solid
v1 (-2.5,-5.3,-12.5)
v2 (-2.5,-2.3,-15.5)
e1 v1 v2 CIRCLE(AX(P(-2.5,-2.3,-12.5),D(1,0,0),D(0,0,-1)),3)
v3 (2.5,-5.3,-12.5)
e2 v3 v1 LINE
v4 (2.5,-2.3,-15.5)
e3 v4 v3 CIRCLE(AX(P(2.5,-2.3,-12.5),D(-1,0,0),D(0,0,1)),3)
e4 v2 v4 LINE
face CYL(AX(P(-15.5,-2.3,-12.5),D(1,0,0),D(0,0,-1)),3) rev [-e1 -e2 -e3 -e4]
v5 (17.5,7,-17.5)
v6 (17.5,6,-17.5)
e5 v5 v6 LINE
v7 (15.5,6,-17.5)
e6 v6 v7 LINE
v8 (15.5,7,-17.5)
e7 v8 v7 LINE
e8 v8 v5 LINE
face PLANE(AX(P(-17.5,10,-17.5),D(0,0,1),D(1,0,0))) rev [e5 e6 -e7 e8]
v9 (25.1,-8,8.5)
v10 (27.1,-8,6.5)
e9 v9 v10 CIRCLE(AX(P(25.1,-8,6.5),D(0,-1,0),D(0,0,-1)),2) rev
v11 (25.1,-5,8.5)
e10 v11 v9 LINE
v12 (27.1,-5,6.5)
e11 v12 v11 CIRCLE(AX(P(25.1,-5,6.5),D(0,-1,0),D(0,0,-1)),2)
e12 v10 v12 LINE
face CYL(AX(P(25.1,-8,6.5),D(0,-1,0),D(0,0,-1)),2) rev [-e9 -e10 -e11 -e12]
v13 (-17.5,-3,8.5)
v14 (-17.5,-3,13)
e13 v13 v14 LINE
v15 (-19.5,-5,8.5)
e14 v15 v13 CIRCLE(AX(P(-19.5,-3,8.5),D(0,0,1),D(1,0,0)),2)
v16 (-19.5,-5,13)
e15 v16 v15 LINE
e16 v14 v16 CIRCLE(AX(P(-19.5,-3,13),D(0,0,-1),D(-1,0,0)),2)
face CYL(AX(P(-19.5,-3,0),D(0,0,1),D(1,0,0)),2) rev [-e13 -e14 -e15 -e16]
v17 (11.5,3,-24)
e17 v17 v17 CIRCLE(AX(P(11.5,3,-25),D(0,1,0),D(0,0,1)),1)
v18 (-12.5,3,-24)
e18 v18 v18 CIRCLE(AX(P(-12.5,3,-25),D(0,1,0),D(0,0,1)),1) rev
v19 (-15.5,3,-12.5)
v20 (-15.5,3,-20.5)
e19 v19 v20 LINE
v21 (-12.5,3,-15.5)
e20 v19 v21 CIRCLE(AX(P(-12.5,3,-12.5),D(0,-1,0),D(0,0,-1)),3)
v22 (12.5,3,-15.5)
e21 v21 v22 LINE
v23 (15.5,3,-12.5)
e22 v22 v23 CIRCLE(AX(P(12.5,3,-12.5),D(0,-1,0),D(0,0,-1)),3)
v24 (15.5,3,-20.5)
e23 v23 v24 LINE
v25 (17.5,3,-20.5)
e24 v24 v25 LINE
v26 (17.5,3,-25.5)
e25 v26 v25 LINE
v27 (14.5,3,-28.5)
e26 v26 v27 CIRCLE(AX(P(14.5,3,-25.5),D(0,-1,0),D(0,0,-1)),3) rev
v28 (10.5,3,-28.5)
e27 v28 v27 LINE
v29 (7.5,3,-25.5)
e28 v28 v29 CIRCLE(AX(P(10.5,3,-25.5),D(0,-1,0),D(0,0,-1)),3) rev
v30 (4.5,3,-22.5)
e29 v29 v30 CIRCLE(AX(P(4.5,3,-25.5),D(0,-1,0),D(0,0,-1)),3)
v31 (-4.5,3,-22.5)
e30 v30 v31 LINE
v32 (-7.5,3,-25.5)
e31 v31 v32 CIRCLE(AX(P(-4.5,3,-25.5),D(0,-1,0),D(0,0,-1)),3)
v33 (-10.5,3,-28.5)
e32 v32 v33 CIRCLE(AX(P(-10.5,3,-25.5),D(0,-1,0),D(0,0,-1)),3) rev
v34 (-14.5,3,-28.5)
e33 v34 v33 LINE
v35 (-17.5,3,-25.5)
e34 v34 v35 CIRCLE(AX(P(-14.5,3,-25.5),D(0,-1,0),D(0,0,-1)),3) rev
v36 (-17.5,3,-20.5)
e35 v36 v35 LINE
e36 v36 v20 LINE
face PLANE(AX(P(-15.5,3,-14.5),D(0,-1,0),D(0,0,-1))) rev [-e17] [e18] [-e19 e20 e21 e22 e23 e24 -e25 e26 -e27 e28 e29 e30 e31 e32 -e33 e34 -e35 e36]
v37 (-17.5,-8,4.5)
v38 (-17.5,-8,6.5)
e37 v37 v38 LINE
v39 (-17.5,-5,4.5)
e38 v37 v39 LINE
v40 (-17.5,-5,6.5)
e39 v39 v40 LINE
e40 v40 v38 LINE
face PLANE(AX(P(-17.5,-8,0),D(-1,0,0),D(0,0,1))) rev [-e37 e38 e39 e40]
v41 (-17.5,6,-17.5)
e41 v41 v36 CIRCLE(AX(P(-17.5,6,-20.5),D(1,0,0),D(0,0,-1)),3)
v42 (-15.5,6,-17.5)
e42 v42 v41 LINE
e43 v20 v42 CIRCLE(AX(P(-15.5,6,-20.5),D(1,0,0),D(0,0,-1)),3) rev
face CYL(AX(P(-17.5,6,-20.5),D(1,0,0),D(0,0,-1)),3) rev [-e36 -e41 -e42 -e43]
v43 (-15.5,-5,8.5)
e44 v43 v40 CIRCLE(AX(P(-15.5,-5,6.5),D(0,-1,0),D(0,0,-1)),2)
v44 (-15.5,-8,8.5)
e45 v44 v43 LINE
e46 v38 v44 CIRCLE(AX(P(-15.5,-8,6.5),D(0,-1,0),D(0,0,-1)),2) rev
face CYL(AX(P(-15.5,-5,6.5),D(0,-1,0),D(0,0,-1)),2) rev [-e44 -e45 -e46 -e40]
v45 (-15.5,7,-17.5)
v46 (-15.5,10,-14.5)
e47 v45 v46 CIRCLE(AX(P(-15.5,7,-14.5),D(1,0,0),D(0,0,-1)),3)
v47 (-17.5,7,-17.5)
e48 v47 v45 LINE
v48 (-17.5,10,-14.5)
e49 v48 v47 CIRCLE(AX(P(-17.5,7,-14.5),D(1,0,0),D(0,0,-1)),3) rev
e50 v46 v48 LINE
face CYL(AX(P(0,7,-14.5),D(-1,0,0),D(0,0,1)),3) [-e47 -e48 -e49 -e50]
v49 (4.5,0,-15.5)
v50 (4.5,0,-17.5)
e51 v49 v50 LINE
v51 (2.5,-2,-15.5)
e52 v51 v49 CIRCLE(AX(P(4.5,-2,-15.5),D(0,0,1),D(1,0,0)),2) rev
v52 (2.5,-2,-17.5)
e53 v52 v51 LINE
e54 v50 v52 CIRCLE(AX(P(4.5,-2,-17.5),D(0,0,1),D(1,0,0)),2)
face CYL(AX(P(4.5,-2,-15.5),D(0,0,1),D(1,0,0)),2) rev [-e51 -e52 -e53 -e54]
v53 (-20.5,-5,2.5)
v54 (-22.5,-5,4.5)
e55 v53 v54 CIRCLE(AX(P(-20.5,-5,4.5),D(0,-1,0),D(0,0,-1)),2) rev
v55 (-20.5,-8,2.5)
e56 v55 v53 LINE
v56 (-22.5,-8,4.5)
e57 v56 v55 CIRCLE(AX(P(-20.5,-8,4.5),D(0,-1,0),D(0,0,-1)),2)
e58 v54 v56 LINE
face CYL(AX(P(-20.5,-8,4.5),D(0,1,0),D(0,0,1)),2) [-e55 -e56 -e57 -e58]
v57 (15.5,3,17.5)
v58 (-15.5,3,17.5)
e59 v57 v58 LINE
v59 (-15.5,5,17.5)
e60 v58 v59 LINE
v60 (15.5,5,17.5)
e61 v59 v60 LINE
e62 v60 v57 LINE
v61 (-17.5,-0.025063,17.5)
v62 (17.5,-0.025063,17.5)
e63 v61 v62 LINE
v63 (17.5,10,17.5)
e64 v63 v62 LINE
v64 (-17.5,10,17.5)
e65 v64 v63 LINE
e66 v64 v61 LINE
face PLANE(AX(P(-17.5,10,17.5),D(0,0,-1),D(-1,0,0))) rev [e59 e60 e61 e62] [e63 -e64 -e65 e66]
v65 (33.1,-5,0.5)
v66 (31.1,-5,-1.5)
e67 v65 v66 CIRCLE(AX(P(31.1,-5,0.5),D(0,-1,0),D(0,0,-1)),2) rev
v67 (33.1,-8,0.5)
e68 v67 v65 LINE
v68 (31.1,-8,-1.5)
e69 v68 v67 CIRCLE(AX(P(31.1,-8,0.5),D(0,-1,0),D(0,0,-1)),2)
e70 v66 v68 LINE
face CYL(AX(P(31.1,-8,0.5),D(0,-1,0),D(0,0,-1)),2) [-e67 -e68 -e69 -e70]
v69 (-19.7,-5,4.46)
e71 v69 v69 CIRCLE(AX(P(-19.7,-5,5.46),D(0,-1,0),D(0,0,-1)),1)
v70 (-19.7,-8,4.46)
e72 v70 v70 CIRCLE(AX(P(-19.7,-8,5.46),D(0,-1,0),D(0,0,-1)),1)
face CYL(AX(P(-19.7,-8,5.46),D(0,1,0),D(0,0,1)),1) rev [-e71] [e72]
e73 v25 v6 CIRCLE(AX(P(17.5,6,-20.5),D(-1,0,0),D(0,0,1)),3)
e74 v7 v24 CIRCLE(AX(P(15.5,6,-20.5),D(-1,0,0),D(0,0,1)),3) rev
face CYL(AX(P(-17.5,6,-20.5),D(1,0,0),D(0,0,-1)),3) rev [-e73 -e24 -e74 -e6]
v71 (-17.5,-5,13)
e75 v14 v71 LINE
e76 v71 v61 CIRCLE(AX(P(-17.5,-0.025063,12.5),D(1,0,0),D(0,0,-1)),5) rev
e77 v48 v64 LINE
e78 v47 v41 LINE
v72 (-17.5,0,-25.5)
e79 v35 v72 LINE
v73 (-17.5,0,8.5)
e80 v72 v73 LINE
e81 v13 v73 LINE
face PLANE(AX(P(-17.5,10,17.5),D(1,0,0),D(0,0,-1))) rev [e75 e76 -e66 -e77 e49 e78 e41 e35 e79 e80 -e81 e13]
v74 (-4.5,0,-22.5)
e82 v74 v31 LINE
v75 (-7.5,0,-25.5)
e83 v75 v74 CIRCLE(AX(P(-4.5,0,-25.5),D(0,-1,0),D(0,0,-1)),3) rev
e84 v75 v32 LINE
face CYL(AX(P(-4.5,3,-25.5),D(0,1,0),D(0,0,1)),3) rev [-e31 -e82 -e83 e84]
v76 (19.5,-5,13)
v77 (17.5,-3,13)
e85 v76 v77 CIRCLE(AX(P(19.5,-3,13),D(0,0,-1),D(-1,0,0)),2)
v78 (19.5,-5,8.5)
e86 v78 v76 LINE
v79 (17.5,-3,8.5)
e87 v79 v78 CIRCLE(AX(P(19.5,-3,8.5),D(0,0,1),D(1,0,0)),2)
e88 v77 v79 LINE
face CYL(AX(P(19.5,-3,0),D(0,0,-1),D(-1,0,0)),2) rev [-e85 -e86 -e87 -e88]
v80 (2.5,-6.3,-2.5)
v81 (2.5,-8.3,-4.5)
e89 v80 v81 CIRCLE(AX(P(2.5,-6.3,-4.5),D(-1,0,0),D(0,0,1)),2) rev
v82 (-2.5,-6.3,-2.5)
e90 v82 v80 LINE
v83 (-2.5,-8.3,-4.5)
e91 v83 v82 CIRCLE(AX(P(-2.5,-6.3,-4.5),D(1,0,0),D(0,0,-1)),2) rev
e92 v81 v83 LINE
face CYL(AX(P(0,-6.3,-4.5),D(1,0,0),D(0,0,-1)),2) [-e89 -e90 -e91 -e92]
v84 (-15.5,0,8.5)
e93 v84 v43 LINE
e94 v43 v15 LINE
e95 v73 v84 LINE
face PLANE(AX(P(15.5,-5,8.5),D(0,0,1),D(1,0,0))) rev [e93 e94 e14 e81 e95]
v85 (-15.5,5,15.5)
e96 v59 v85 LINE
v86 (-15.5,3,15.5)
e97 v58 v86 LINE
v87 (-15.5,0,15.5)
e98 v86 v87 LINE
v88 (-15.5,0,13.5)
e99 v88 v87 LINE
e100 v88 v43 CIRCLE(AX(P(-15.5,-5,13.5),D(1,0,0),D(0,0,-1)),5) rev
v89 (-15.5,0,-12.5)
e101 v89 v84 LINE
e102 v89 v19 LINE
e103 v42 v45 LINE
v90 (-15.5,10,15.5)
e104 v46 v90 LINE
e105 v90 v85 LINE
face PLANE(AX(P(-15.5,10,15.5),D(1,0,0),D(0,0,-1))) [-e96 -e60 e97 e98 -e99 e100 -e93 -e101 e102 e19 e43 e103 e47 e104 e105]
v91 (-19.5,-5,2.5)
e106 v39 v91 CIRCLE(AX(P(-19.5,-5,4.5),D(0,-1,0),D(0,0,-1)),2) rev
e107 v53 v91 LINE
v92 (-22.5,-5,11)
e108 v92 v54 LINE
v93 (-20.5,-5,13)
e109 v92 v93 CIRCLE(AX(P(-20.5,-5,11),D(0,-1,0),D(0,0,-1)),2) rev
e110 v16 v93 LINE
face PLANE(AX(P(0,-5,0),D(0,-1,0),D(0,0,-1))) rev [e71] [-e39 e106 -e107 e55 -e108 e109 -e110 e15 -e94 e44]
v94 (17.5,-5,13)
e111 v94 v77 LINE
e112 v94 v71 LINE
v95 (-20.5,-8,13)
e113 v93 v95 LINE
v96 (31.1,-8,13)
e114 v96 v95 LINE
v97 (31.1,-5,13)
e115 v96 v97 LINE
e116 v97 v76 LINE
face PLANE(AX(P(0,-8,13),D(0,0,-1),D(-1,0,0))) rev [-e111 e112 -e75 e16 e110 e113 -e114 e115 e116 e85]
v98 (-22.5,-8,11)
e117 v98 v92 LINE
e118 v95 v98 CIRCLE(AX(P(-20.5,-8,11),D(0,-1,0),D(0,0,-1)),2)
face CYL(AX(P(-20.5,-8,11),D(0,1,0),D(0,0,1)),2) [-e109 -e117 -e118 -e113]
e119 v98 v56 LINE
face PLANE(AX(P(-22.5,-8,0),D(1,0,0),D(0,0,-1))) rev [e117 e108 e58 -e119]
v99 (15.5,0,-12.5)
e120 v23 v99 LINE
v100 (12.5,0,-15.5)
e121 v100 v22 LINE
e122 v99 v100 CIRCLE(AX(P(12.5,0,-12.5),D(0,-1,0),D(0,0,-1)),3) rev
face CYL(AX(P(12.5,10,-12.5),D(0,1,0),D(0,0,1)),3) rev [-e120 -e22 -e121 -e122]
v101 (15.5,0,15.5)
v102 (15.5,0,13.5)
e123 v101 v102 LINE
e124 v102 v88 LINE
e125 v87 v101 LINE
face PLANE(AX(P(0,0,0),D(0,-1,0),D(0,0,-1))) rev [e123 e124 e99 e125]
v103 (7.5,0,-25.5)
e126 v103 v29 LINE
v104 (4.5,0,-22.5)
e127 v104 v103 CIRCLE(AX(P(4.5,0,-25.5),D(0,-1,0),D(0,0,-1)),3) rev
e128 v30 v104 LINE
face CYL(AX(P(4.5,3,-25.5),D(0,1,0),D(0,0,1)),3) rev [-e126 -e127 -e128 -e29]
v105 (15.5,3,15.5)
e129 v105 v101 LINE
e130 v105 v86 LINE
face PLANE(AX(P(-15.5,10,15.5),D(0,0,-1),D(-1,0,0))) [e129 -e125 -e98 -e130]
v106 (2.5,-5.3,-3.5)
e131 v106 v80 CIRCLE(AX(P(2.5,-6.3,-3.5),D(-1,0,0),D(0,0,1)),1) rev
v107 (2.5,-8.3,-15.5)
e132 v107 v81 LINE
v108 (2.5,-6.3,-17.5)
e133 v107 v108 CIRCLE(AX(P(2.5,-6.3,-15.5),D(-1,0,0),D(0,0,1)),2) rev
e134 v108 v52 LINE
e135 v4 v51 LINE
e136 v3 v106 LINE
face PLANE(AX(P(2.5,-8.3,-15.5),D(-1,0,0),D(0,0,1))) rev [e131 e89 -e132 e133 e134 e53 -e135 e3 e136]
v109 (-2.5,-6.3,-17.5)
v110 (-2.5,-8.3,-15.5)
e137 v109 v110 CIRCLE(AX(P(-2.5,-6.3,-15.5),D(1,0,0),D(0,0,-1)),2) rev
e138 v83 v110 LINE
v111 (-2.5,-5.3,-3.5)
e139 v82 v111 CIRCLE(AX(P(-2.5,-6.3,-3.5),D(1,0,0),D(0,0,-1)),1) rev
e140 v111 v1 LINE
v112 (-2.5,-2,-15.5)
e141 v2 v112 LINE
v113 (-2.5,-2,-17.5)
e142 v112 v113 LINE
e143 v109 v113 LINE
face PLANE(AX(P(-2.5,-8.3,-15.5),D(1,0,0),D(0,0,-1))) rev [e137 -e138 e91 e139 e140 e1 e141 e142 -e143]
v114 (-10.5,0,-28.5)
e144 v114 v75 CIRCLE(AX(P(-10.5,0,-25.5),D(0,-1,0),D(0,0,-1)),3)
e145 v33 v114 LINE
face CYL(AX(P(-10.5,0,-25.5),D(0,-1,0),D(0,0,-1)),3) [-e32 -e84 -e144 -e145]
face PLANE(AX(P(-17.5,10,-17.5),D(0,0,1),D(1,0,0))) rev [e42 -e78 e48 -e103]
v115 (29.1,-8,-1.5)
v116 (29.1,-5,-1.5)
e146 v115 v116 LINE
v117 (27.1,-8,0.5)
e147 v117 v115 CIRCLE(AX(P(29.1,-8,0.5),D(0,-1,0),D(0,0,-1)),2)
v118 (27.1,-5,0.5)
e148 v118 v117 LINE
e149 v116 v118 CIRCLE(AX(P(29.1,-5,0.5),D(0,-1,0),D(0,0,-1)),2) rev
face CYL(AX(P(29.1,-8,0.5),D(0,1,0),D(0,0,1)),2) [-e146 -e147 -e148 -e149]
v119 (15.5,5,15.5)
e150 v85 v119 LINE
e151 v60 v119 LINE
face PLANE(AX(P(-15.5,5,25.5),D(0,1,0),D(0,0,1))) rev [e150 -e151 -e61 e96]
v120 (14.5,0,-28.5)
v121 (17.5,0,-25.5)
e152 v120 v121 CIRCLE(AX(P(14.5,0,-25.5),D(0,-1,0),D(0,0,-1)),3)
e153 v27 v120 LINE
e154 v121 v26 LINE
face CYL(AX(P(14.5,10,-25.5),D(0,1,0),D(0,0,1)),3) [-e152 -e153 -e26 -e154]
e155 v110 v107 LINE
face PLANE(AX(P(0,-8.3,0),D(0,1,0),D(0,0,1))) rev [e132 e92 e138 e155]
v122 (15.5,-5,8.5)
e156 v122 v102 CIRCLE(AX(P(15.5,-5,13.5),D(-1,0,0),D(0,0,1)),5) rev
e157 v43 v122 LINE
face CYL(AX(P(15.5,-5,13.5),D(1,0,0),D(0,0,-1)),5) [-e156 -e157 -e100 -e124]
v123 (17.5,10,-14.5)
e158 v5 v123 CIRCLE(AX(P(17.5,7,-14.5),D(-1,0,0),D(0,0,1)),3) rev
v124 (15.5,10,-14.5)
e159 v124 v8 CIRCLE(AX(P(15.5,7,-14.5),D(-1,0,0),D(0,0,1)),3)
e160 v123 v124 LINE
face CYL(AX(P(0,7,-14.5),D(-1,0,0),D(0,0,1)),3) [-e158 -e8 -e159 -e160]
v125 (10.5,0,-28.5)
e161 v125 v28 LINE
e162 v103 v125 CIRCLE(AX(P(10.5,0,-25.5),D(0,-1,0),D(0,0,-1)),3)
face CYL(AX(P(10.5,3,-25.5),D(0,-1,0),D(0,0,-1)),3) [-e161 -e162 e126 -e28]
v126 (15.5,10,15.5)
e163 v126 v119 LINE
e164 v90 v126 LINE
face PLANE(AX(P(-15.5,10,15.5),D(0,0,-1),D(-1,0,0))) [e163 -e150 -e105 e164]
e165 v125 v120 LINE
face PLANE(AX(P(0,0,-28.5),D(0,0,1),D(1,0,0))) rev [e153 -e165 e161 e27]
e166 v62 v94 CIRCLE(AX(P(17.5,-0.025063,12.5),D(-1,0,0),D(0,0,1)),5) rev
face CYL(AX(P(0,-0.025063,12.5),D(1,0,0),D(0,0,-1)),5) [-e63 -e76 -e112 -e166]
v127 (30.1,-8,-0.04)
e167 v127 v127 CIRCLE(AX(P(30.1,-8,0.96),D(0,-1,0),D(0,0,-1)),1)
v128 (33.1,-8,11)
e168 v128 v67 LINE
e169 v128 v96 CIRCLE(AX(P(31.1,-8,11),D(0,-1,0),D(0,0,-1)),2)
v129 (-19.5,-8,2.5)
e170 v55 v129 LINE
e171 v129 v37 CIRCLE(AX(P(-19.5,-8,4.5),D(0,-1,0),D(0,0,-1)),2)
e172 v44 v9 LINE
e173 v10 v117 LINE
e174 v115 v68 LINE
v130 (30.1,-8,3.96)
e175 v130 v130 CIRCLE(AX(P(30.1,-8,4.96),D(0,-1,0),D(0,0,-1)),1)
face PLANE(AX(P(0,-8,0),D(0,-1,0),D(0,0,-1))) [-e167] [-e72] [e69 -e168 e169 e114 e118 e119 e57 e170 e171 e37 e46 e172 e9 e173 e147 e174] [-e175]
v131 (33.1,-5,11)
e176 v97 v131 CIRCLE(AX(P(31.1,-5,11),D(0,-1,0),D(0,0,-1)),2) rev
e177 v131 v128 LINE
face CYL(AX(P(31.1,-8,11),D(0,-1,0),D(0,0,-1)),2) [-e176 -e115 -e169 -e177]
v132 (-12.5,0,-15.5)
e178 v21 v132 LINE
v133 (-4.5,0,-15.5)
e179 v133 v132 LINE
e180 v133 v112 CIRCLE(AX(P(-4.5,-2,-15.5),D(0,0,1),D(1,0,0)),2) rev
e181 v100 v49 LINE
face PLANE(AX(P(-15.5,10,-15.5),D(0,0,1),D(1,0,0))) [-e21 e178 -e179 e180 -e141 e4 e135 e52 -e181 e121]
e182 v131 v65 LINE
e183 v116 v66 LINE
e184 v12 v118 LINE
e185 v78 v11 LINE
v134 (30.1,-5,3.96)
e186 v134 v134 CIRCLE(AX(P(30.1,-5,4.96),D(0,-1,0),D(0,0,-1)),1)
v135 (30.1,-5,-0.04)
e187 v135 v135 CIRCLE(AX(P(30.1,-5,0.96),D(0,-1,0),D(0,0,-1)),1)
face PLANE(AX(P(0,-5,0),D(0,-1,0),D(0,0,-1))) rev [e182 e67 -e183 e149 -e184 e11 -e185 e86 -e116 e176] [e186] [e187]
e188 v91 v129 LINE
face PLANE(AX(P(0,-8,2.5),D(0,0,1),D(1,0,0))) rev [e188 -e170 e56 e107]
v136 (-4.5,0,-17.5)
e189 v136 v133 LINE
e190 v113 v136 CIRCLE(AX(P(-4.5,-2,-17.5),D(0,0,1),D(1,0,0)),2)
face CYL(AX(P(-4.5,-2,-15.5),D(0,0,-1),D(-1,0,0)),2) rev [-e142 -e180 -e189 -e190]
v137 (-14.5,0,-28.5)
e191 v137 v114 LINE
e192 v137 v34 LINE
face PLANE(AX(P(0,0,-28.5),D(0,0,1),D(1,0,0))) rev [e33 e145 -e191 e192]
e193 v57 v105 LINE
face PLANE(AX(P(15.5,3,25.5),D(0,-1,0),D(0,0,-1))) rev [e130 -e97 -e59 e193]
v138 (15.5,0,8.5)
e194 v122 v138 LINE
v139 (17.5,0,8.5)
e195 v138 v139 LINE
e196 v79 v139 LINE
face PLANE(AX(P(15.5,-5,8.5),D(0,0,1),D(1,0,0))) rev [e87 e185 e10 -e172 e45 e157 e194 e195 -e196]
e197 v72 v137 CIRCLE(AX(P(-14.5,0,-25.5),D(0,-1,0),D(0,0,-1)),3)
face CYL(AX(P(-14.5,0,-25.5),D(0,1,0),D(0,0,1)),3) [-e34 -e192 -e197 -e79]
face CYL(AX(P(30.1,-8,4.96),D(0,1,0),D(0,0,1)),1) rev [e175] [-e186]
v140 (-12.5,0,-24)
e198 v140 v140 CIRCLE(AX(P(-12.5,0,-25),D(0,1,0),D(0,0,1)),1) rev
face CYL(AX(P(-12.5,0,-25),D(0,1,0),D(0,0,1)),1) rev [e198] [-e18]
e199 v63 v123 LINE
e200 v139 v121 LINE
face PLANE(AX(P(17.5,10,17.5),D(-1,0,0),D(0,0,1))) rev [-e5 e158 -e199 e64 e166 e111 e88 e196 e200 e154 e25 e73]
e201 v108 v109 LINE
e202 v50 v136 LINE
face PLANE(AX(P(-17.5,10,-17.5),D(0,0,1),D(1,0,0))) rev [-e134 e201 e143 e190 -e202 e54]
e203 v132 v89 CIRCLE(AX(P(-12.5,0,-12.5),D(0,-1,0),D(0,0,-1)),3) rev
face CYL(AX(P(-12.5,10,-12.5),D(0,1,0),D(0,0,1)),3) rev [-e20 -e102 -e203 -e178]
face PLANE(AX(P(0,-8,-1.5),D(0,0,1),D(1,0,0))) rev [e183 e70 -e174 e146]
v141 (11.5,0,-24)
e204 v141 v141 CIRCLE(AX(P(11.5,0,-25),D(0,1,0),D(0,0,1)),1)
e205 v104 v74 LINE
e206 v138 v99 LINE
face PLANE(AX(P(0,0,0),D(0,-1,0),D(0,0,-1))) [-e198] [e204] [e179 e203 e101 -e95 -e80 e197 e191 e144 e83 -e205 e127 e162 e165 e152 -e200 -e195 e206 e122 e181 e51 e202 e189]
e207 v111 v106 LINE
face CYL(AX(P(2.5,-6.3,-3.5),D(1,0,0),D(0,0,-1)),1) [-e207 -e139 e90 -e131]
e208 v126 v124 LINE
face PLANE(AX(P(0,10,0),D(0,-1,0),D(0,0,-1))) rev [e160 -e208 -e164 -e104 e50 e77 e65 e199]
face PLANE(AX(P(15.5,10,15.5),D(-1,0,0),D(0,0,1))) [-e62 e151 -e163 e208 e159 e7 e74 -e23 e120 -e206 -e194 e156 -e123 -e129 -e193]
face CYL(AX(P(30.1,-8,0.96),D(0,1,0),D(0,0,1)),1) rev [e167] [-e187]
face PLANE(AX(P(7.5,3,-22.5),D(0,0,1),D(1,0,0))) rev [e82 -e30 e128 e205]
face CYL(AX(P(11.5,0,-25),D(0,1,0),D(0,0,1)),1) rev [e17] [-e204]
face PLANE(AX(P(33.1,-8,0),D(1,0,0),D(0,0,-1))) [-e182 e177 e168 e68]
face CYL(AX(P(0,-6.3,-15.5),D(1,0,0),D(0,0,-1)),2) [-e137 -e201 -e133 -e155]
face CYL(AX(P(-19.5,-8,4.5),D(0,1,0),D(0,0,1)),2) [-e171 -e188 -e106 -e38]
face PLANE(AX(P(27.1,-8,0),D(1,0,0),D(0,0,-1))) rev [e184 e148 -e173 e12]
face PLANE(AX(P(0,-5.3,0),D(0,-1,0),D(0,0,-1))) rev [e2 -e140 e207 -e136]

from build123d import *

# Parameters (mm, degrees)
SKETCH_1_W          = 35
SKETCH_1_H          = 35
SKETCH_1_W_2        = 31
SKETCH_1_H_2        = 31
EXTRUDE_1_DEPTH     = 10
EXTRUDE_2_DEPTH     = 5
SKETCH_3_W          = 31
SKETCH_3_H          = 7
CUT_EXTRUDE_1_DEPTH = 3
SKETCH_4_W          = 5
SKETCH_4_H          = 4.5
SKETCH_4_W_2        = 35
SKETCH_4_H_2        = 6
SKETCH_4_R          = 1
SKETCH_4_W_3        = 6
SKETCH_4_H_3        = 10
EXTRUDE_3_DEPTH     = 3
FILLET_2_R          = 2
FILLET_3_R          = 2
SKETCH_5_W          = 5
SKETCH_5_H          = 2
EXTRUDE_4_DEPTH     = 8.3
SKETCH_6_W          = 5
SKETCH_6_H          = 13
EXTRUDE_5_DEPTH     = 3
FILLET_4_R          = 2
FILLET_5_R          = 1
FILLET_6_R          = 2
SKETCH_7_W          = 31
SKETCH_7_H          = 2
CUT_EXTRUDE_2_DEPTH = 10
FILLET_7_R          = 5
SKETCH_8_W          = 35
SKETCH_8_H          = 11
SKETCH_8_R          = 1
EXTRUDE_6_DEPTH     = 3
FILLET_8_R          = 3
FILLET_9_R          = 3
SKETCH_11_W         = 15
SKETCH_11_H         = 6
CUT_EXTRUDE_4_DEPTH = 3
FILLET_START        = -1
FILLET_10_DEPTH     = 4
FILLET_10_2_DEPTH   = 3
FILLET_11_R         = 3


with BuildPart() as part:
    # 草图1 → 凸台-拉伸1 (new body)
    with BuildSketch(Plane(origin=(0, 0, 0), x_dir=(1, 0, 0), z_dir=(0, 1, 0))):
        Rectangle(SKETCH_1_W, SKETCH_1_H)
        Rectangle(SKETCH_1_W_2, SKETCH_1_H_2, mode=Mode.SUBTRACT)
    extrude(amount=EXTRUDE_1_DEPTH)

    # 草图2 → 凸台-拉伸2 (add)
    with BuildSketch(Plane.XZ):
        Polygon((15.5, 8.5), (17.5, 8.5), (17.5, 17.5), (-17.5, 17.5), (-17.5, 8.5), align=None)
    extrude(amount=EXTRUDE_2_DEPTH)

    # 草图3 → 切除-拉伸1 (cut)
    with BuildSketch(Plane(origin=(0, 0, -17.5), x_dir=(-1, 0, 0), z_dir=(0, 0, -1))):
        with Locations((0, 6.5)):
            Rectangle(SKETCH_3_W, SKETCH_3_H)
    extrude(amount=-CUT_EXTRUDE_1_DEPTH, mode=Mode.SUBTRACT)

    # 草图4 → 凸台-拉伸3 (add)
    # profile 1 of 5: a face of its own
    with BuildSketch(Plane.XZ.offset(5)):
        with Locations((-20, 10.75)):
            Rectangle(SKETCH_4_W, SKETCH_4_H)
    # profile 2 of 5: a face of its own
    with BuildSketch(Plane.XZ.offset(5)):
        with Locations((0, 10.75)):
            Rectangle(SKETCH_4_W_2, SKETCH_4_H)
    # profile 3 of 5: a face of its own
    with BuildSketch(Plane.XZ.offset(5)):
        with Locations((-20, 5.5)):
            Rectangle(SKETCH_4_W, SKETCH_4_H_2)
        with Locations(Location((-19.7, 5.46, 0), (0, 0, 270))):
            Circle(SKETCH_4_R, mode=Mode.SUBTRACT)
    # profile 4 of 5: a face of its own
    with BuildSketch(Plane.XZ.offset(5)):
        Polygon((17.5, 13), (17.5, 8.5), (27.1, 8.5), (33.1, 8.5), (33.1, 13), align=None)
    # profile 5 of 5: a face of its own
    with BuildSketch(Plane.XZ.offset(5)):
        with Locations((30.1, 3.5)):
            Rectangle(SKETCH_4_W_3, SKETCH_4_H_3)
        with Locations(Location((30.1, 0.96, 0), (0, 0, 270))):
            Circle(SKETCH_4_R, mode=Mode.SUBTRACT)
        with Locations(Location((30.1, 4.96, 0), (0, 0, 270))):
            Circle(SKETCH_4_R, mode=Mode.SUBTRACT)
    extrude(amount=EXTRUDE_3_DEPTH)

    # 圆角2
    fillet_2_edges = [part.edges().sort_by_distance(p)[0] for p in [
        (-22.5, -6.5, 13),
        (-22.5, -6.5, 2.5),
        (-17.5, -6.5, 2.5),
        (-17.5, -6.5, 8.5),
        (27.1, -6.5, 8.5),
        (27.1, -6.5, -1.5),
        (33.1, -6.5, -1.5),
        (33.1, -6.5, 13),
    ]]
    fillet(fillet_2_edges, radius=FILLET_2_R)

    # 圆角3
    fillet_3_edges = [part.edges().sort_by_distance(p)[0] for p in [
        (17.5, -5, 10.75),
        (-17.5, -5, 10.75),
    ]]
    fillet(fillet_3_edges, radius=FILLET_3_R)

    # 草图5 → 凸台-拉伸4 (add)
    with BuildSketch(Plane.XZ):
        with Locations((0, -16.5)):
            Rectangle(SKETCH_5_W, SKETCH_5_H)
    extrude(amount=EXTRUDE_4_DEPTH)

    # 草图6 → 凸台-拉伸5 (add)
    with BuildSketch(Plane.XZ.offset(8.3)):
        with Locations((0, -9)):
            Rectangle(SKETCH_6_W, SKETCH_6_H)
    extrude(amount=-EXTRUDE_5_DEPTH)

    # 圆角4
    fillet_4_edges = [part.edges().sort_by_distance(p)[0] for p in [
        (0, -8.3, -17.5),
        (0, -8.3, -2.5),
    ]]
    fillet(fillet_4_edges, radius=FILLET_4_R)

    # 圆角5
    fillet_5_edges = [part.edges().sort_by_distance(p)[0] for p in [
        (0, -5.3, -2.5),
    ]]
    fillet(fillet_5_edges, radius=FILLET_5_R - 0.0001)  # a hair under: the kernel refuses the full size

    # 圆角6
    fillet_6_edges = [part.edges().sort_by_distance(p)[0] for p in [
        (2.5, 0, -16.5),
        (-2.5, 0, -16.5),
    ]]
    fillet(fillet_6_edges, radius=FILLET_6_R)

    # 草图7 → 切除-拉伸2 (cut)
    with BuildSketch(Plane(origin=(0, 0, 15.5), x_dir=(-1, 0, 0), z_dir=(0, 0, -1))):
        with Locations((0, 4)):
            Rectangle(SKETCH_7_W, SKETCH_7_H)
    extrude(amount=-CUT_EXTRUDE_2_DEPTH, mode=Mode.SUBTRACT)

    # 圆角7
    # the kernel refuses this fillet: 5 mm, written as the material it takes off along each edge
    with BuildSketch(Plane(origin=(-15.5, 0, 8.5), x_dir=(0, -1, 0), z_dir=(1, 0, 0))) as fillet_7_piece_1:
        with BuildLine():
            CenterArc((FILLET_7_R, -FILLET_7_R), FILLET_7_R, 90, 90)
            Line((0, -FILLET_7_R), (0, 0))
            Line((0, 0), (FILLET_7_R, 0))
        make_face()
    extrude(amount=31, mode=Mode.SUBTRACT)
    with BuildSketch(Plane(origin=(29.937342964, -5, 17.5), x_dir=(0, 0, -1), z_dir=(-1, 0, 0))) as fillet_7_piece_2:
        with BuildLine():
            CenterArc((5, -4.974937186), FILLET_7_R, 95.739170477, 84.260829523)
            Line((0, -4.974937186), (0, 0))
            Line((0, 0), (4.5, 0))
        make_face()
    extrude(amount=59.874685928, mode=Mode.SUBTRACT)

    # 草图8 → 凸台-拉伸6 (add)
    with BuildSketch(Plane(origin=(0, 3, 0), x_dir=(1, 0, 0), z_dir=(0, 1, 0))):
        with Locations((0, 23)):
            Rectangle(SKETCH_8_W, SKETCH_8_H)
        with Locations(Location((11.5, 25, 0), (0, 0, 270))):
            Circle(SKETCH_8_R, mode=Mode.SUBTRACT)
        with Locations(Location((-12.5, 25, 0), (0, 0, 270))):
            Circle(SKETCH_8_R, mode=Mode.SUBTRACT)
    extrude(amount=-EXTRUDE_6_DEPTH)

    # 圆角8
    fillet_8_edges = [part.edges().sort_by_distance(p)[0] for p in [
        (16.5, 3, -17.5),
        (-16.5, 3, -17.5),
        (-17.5, 1.5, -28.5),
        (17.5, 1.5, -28.5),
        (-16.5, 10, -17.5),
        (16.5, 10, -17.5),
    ]]
    fillet(fillet_8_edges, radius=FILLET_8_R)

    # 圆角9
    fillet_9_edges = [part.edges().sort_by_distance(p)[0] for p in [
        (-15.5, 1.5, -15.5),
        (15.5, 1.5, -15.5),
    ]]
    fillet(fillet_9_edges, radius=FILLET_9_R)

    # 草图11 → 切除-拉伸4 (cut)
    with BuildSketch(Plane.XZ):
        with Locations((0, -25.5)):
            Rectangle(SKETCH_11_W, SKETCH_11_H)
    extrude(amount=-CUT_EXTRUDE_4_DEPTH, mode=Mode.SUBTRACT)

    # 圆角10: read off the stored shape, not the designer's step
    # 圆角10 outline → 圆角10 (cut)
    with BuildSketch(Plane(origin=(0, 0, 0), x_dir=(1, 0, 0), z_dir=(0, 1, 0)).offset(FILLET_START)):
        with BuildLine():
            Line((7.5, 28.5), (7.5, 25.5))
            ThreePointArc((7.5, 25.5), (8.378679656, 27.621320344), (10.5, 28.5))
            Line((10.5, 28.5), (7.5, 28.5))
        make_face()
        with BuildLine():
            ThreePointArc((-10.5, 28.5), (-8.378679656, 27.621320344), (-7.5, 25.5))
            Line((-7.5, 25.5), (-7.5, 28.5))
            Line((-7.5, 28.5), (-10.5, 28.5))
        make_face()
    extrude(amount=FILLET_10_DEPTH, mode=Mode.SUBTRACT)

    # Fillet 10 2 outline → Fillet 10 2 (add)
    with BuildSketch(Plane(origin=(0, 0, 0), x_dir=(1, 0, 0), z_dir=(0, 1, 0))):
        with BuildLine():
            Line((-7.5, 22.5), (-4.5, 22.5))
            ThreePointArc((-4.5, 22.5), (-6.621320344, 23.378679656), (-7.5, 25.5))
            Line((-7.5, 25.5), (-7.5, 22.5))
        make_face()
        with BuildLine():
            ThreePointArc((7.5, 25.5), (6.621320344, 23.378679656), (4.5, 22.5))
            Line((4.5, 22.5), (7.5, 22.5))
            Line((7.5, 22.5), (7.5, 25.5))
        make_face()
    extrude(amount=FILLET_10_2_DEPTH)

    # 圆角11
    fillet_11_edges = [part.edges().sort_by_distance(p)[0] for p in [
        (0, -5.3, -15.5),
    ]]
    fillet(fillet_11_edges, radius=FILLET_11_R)


solid = part.part
